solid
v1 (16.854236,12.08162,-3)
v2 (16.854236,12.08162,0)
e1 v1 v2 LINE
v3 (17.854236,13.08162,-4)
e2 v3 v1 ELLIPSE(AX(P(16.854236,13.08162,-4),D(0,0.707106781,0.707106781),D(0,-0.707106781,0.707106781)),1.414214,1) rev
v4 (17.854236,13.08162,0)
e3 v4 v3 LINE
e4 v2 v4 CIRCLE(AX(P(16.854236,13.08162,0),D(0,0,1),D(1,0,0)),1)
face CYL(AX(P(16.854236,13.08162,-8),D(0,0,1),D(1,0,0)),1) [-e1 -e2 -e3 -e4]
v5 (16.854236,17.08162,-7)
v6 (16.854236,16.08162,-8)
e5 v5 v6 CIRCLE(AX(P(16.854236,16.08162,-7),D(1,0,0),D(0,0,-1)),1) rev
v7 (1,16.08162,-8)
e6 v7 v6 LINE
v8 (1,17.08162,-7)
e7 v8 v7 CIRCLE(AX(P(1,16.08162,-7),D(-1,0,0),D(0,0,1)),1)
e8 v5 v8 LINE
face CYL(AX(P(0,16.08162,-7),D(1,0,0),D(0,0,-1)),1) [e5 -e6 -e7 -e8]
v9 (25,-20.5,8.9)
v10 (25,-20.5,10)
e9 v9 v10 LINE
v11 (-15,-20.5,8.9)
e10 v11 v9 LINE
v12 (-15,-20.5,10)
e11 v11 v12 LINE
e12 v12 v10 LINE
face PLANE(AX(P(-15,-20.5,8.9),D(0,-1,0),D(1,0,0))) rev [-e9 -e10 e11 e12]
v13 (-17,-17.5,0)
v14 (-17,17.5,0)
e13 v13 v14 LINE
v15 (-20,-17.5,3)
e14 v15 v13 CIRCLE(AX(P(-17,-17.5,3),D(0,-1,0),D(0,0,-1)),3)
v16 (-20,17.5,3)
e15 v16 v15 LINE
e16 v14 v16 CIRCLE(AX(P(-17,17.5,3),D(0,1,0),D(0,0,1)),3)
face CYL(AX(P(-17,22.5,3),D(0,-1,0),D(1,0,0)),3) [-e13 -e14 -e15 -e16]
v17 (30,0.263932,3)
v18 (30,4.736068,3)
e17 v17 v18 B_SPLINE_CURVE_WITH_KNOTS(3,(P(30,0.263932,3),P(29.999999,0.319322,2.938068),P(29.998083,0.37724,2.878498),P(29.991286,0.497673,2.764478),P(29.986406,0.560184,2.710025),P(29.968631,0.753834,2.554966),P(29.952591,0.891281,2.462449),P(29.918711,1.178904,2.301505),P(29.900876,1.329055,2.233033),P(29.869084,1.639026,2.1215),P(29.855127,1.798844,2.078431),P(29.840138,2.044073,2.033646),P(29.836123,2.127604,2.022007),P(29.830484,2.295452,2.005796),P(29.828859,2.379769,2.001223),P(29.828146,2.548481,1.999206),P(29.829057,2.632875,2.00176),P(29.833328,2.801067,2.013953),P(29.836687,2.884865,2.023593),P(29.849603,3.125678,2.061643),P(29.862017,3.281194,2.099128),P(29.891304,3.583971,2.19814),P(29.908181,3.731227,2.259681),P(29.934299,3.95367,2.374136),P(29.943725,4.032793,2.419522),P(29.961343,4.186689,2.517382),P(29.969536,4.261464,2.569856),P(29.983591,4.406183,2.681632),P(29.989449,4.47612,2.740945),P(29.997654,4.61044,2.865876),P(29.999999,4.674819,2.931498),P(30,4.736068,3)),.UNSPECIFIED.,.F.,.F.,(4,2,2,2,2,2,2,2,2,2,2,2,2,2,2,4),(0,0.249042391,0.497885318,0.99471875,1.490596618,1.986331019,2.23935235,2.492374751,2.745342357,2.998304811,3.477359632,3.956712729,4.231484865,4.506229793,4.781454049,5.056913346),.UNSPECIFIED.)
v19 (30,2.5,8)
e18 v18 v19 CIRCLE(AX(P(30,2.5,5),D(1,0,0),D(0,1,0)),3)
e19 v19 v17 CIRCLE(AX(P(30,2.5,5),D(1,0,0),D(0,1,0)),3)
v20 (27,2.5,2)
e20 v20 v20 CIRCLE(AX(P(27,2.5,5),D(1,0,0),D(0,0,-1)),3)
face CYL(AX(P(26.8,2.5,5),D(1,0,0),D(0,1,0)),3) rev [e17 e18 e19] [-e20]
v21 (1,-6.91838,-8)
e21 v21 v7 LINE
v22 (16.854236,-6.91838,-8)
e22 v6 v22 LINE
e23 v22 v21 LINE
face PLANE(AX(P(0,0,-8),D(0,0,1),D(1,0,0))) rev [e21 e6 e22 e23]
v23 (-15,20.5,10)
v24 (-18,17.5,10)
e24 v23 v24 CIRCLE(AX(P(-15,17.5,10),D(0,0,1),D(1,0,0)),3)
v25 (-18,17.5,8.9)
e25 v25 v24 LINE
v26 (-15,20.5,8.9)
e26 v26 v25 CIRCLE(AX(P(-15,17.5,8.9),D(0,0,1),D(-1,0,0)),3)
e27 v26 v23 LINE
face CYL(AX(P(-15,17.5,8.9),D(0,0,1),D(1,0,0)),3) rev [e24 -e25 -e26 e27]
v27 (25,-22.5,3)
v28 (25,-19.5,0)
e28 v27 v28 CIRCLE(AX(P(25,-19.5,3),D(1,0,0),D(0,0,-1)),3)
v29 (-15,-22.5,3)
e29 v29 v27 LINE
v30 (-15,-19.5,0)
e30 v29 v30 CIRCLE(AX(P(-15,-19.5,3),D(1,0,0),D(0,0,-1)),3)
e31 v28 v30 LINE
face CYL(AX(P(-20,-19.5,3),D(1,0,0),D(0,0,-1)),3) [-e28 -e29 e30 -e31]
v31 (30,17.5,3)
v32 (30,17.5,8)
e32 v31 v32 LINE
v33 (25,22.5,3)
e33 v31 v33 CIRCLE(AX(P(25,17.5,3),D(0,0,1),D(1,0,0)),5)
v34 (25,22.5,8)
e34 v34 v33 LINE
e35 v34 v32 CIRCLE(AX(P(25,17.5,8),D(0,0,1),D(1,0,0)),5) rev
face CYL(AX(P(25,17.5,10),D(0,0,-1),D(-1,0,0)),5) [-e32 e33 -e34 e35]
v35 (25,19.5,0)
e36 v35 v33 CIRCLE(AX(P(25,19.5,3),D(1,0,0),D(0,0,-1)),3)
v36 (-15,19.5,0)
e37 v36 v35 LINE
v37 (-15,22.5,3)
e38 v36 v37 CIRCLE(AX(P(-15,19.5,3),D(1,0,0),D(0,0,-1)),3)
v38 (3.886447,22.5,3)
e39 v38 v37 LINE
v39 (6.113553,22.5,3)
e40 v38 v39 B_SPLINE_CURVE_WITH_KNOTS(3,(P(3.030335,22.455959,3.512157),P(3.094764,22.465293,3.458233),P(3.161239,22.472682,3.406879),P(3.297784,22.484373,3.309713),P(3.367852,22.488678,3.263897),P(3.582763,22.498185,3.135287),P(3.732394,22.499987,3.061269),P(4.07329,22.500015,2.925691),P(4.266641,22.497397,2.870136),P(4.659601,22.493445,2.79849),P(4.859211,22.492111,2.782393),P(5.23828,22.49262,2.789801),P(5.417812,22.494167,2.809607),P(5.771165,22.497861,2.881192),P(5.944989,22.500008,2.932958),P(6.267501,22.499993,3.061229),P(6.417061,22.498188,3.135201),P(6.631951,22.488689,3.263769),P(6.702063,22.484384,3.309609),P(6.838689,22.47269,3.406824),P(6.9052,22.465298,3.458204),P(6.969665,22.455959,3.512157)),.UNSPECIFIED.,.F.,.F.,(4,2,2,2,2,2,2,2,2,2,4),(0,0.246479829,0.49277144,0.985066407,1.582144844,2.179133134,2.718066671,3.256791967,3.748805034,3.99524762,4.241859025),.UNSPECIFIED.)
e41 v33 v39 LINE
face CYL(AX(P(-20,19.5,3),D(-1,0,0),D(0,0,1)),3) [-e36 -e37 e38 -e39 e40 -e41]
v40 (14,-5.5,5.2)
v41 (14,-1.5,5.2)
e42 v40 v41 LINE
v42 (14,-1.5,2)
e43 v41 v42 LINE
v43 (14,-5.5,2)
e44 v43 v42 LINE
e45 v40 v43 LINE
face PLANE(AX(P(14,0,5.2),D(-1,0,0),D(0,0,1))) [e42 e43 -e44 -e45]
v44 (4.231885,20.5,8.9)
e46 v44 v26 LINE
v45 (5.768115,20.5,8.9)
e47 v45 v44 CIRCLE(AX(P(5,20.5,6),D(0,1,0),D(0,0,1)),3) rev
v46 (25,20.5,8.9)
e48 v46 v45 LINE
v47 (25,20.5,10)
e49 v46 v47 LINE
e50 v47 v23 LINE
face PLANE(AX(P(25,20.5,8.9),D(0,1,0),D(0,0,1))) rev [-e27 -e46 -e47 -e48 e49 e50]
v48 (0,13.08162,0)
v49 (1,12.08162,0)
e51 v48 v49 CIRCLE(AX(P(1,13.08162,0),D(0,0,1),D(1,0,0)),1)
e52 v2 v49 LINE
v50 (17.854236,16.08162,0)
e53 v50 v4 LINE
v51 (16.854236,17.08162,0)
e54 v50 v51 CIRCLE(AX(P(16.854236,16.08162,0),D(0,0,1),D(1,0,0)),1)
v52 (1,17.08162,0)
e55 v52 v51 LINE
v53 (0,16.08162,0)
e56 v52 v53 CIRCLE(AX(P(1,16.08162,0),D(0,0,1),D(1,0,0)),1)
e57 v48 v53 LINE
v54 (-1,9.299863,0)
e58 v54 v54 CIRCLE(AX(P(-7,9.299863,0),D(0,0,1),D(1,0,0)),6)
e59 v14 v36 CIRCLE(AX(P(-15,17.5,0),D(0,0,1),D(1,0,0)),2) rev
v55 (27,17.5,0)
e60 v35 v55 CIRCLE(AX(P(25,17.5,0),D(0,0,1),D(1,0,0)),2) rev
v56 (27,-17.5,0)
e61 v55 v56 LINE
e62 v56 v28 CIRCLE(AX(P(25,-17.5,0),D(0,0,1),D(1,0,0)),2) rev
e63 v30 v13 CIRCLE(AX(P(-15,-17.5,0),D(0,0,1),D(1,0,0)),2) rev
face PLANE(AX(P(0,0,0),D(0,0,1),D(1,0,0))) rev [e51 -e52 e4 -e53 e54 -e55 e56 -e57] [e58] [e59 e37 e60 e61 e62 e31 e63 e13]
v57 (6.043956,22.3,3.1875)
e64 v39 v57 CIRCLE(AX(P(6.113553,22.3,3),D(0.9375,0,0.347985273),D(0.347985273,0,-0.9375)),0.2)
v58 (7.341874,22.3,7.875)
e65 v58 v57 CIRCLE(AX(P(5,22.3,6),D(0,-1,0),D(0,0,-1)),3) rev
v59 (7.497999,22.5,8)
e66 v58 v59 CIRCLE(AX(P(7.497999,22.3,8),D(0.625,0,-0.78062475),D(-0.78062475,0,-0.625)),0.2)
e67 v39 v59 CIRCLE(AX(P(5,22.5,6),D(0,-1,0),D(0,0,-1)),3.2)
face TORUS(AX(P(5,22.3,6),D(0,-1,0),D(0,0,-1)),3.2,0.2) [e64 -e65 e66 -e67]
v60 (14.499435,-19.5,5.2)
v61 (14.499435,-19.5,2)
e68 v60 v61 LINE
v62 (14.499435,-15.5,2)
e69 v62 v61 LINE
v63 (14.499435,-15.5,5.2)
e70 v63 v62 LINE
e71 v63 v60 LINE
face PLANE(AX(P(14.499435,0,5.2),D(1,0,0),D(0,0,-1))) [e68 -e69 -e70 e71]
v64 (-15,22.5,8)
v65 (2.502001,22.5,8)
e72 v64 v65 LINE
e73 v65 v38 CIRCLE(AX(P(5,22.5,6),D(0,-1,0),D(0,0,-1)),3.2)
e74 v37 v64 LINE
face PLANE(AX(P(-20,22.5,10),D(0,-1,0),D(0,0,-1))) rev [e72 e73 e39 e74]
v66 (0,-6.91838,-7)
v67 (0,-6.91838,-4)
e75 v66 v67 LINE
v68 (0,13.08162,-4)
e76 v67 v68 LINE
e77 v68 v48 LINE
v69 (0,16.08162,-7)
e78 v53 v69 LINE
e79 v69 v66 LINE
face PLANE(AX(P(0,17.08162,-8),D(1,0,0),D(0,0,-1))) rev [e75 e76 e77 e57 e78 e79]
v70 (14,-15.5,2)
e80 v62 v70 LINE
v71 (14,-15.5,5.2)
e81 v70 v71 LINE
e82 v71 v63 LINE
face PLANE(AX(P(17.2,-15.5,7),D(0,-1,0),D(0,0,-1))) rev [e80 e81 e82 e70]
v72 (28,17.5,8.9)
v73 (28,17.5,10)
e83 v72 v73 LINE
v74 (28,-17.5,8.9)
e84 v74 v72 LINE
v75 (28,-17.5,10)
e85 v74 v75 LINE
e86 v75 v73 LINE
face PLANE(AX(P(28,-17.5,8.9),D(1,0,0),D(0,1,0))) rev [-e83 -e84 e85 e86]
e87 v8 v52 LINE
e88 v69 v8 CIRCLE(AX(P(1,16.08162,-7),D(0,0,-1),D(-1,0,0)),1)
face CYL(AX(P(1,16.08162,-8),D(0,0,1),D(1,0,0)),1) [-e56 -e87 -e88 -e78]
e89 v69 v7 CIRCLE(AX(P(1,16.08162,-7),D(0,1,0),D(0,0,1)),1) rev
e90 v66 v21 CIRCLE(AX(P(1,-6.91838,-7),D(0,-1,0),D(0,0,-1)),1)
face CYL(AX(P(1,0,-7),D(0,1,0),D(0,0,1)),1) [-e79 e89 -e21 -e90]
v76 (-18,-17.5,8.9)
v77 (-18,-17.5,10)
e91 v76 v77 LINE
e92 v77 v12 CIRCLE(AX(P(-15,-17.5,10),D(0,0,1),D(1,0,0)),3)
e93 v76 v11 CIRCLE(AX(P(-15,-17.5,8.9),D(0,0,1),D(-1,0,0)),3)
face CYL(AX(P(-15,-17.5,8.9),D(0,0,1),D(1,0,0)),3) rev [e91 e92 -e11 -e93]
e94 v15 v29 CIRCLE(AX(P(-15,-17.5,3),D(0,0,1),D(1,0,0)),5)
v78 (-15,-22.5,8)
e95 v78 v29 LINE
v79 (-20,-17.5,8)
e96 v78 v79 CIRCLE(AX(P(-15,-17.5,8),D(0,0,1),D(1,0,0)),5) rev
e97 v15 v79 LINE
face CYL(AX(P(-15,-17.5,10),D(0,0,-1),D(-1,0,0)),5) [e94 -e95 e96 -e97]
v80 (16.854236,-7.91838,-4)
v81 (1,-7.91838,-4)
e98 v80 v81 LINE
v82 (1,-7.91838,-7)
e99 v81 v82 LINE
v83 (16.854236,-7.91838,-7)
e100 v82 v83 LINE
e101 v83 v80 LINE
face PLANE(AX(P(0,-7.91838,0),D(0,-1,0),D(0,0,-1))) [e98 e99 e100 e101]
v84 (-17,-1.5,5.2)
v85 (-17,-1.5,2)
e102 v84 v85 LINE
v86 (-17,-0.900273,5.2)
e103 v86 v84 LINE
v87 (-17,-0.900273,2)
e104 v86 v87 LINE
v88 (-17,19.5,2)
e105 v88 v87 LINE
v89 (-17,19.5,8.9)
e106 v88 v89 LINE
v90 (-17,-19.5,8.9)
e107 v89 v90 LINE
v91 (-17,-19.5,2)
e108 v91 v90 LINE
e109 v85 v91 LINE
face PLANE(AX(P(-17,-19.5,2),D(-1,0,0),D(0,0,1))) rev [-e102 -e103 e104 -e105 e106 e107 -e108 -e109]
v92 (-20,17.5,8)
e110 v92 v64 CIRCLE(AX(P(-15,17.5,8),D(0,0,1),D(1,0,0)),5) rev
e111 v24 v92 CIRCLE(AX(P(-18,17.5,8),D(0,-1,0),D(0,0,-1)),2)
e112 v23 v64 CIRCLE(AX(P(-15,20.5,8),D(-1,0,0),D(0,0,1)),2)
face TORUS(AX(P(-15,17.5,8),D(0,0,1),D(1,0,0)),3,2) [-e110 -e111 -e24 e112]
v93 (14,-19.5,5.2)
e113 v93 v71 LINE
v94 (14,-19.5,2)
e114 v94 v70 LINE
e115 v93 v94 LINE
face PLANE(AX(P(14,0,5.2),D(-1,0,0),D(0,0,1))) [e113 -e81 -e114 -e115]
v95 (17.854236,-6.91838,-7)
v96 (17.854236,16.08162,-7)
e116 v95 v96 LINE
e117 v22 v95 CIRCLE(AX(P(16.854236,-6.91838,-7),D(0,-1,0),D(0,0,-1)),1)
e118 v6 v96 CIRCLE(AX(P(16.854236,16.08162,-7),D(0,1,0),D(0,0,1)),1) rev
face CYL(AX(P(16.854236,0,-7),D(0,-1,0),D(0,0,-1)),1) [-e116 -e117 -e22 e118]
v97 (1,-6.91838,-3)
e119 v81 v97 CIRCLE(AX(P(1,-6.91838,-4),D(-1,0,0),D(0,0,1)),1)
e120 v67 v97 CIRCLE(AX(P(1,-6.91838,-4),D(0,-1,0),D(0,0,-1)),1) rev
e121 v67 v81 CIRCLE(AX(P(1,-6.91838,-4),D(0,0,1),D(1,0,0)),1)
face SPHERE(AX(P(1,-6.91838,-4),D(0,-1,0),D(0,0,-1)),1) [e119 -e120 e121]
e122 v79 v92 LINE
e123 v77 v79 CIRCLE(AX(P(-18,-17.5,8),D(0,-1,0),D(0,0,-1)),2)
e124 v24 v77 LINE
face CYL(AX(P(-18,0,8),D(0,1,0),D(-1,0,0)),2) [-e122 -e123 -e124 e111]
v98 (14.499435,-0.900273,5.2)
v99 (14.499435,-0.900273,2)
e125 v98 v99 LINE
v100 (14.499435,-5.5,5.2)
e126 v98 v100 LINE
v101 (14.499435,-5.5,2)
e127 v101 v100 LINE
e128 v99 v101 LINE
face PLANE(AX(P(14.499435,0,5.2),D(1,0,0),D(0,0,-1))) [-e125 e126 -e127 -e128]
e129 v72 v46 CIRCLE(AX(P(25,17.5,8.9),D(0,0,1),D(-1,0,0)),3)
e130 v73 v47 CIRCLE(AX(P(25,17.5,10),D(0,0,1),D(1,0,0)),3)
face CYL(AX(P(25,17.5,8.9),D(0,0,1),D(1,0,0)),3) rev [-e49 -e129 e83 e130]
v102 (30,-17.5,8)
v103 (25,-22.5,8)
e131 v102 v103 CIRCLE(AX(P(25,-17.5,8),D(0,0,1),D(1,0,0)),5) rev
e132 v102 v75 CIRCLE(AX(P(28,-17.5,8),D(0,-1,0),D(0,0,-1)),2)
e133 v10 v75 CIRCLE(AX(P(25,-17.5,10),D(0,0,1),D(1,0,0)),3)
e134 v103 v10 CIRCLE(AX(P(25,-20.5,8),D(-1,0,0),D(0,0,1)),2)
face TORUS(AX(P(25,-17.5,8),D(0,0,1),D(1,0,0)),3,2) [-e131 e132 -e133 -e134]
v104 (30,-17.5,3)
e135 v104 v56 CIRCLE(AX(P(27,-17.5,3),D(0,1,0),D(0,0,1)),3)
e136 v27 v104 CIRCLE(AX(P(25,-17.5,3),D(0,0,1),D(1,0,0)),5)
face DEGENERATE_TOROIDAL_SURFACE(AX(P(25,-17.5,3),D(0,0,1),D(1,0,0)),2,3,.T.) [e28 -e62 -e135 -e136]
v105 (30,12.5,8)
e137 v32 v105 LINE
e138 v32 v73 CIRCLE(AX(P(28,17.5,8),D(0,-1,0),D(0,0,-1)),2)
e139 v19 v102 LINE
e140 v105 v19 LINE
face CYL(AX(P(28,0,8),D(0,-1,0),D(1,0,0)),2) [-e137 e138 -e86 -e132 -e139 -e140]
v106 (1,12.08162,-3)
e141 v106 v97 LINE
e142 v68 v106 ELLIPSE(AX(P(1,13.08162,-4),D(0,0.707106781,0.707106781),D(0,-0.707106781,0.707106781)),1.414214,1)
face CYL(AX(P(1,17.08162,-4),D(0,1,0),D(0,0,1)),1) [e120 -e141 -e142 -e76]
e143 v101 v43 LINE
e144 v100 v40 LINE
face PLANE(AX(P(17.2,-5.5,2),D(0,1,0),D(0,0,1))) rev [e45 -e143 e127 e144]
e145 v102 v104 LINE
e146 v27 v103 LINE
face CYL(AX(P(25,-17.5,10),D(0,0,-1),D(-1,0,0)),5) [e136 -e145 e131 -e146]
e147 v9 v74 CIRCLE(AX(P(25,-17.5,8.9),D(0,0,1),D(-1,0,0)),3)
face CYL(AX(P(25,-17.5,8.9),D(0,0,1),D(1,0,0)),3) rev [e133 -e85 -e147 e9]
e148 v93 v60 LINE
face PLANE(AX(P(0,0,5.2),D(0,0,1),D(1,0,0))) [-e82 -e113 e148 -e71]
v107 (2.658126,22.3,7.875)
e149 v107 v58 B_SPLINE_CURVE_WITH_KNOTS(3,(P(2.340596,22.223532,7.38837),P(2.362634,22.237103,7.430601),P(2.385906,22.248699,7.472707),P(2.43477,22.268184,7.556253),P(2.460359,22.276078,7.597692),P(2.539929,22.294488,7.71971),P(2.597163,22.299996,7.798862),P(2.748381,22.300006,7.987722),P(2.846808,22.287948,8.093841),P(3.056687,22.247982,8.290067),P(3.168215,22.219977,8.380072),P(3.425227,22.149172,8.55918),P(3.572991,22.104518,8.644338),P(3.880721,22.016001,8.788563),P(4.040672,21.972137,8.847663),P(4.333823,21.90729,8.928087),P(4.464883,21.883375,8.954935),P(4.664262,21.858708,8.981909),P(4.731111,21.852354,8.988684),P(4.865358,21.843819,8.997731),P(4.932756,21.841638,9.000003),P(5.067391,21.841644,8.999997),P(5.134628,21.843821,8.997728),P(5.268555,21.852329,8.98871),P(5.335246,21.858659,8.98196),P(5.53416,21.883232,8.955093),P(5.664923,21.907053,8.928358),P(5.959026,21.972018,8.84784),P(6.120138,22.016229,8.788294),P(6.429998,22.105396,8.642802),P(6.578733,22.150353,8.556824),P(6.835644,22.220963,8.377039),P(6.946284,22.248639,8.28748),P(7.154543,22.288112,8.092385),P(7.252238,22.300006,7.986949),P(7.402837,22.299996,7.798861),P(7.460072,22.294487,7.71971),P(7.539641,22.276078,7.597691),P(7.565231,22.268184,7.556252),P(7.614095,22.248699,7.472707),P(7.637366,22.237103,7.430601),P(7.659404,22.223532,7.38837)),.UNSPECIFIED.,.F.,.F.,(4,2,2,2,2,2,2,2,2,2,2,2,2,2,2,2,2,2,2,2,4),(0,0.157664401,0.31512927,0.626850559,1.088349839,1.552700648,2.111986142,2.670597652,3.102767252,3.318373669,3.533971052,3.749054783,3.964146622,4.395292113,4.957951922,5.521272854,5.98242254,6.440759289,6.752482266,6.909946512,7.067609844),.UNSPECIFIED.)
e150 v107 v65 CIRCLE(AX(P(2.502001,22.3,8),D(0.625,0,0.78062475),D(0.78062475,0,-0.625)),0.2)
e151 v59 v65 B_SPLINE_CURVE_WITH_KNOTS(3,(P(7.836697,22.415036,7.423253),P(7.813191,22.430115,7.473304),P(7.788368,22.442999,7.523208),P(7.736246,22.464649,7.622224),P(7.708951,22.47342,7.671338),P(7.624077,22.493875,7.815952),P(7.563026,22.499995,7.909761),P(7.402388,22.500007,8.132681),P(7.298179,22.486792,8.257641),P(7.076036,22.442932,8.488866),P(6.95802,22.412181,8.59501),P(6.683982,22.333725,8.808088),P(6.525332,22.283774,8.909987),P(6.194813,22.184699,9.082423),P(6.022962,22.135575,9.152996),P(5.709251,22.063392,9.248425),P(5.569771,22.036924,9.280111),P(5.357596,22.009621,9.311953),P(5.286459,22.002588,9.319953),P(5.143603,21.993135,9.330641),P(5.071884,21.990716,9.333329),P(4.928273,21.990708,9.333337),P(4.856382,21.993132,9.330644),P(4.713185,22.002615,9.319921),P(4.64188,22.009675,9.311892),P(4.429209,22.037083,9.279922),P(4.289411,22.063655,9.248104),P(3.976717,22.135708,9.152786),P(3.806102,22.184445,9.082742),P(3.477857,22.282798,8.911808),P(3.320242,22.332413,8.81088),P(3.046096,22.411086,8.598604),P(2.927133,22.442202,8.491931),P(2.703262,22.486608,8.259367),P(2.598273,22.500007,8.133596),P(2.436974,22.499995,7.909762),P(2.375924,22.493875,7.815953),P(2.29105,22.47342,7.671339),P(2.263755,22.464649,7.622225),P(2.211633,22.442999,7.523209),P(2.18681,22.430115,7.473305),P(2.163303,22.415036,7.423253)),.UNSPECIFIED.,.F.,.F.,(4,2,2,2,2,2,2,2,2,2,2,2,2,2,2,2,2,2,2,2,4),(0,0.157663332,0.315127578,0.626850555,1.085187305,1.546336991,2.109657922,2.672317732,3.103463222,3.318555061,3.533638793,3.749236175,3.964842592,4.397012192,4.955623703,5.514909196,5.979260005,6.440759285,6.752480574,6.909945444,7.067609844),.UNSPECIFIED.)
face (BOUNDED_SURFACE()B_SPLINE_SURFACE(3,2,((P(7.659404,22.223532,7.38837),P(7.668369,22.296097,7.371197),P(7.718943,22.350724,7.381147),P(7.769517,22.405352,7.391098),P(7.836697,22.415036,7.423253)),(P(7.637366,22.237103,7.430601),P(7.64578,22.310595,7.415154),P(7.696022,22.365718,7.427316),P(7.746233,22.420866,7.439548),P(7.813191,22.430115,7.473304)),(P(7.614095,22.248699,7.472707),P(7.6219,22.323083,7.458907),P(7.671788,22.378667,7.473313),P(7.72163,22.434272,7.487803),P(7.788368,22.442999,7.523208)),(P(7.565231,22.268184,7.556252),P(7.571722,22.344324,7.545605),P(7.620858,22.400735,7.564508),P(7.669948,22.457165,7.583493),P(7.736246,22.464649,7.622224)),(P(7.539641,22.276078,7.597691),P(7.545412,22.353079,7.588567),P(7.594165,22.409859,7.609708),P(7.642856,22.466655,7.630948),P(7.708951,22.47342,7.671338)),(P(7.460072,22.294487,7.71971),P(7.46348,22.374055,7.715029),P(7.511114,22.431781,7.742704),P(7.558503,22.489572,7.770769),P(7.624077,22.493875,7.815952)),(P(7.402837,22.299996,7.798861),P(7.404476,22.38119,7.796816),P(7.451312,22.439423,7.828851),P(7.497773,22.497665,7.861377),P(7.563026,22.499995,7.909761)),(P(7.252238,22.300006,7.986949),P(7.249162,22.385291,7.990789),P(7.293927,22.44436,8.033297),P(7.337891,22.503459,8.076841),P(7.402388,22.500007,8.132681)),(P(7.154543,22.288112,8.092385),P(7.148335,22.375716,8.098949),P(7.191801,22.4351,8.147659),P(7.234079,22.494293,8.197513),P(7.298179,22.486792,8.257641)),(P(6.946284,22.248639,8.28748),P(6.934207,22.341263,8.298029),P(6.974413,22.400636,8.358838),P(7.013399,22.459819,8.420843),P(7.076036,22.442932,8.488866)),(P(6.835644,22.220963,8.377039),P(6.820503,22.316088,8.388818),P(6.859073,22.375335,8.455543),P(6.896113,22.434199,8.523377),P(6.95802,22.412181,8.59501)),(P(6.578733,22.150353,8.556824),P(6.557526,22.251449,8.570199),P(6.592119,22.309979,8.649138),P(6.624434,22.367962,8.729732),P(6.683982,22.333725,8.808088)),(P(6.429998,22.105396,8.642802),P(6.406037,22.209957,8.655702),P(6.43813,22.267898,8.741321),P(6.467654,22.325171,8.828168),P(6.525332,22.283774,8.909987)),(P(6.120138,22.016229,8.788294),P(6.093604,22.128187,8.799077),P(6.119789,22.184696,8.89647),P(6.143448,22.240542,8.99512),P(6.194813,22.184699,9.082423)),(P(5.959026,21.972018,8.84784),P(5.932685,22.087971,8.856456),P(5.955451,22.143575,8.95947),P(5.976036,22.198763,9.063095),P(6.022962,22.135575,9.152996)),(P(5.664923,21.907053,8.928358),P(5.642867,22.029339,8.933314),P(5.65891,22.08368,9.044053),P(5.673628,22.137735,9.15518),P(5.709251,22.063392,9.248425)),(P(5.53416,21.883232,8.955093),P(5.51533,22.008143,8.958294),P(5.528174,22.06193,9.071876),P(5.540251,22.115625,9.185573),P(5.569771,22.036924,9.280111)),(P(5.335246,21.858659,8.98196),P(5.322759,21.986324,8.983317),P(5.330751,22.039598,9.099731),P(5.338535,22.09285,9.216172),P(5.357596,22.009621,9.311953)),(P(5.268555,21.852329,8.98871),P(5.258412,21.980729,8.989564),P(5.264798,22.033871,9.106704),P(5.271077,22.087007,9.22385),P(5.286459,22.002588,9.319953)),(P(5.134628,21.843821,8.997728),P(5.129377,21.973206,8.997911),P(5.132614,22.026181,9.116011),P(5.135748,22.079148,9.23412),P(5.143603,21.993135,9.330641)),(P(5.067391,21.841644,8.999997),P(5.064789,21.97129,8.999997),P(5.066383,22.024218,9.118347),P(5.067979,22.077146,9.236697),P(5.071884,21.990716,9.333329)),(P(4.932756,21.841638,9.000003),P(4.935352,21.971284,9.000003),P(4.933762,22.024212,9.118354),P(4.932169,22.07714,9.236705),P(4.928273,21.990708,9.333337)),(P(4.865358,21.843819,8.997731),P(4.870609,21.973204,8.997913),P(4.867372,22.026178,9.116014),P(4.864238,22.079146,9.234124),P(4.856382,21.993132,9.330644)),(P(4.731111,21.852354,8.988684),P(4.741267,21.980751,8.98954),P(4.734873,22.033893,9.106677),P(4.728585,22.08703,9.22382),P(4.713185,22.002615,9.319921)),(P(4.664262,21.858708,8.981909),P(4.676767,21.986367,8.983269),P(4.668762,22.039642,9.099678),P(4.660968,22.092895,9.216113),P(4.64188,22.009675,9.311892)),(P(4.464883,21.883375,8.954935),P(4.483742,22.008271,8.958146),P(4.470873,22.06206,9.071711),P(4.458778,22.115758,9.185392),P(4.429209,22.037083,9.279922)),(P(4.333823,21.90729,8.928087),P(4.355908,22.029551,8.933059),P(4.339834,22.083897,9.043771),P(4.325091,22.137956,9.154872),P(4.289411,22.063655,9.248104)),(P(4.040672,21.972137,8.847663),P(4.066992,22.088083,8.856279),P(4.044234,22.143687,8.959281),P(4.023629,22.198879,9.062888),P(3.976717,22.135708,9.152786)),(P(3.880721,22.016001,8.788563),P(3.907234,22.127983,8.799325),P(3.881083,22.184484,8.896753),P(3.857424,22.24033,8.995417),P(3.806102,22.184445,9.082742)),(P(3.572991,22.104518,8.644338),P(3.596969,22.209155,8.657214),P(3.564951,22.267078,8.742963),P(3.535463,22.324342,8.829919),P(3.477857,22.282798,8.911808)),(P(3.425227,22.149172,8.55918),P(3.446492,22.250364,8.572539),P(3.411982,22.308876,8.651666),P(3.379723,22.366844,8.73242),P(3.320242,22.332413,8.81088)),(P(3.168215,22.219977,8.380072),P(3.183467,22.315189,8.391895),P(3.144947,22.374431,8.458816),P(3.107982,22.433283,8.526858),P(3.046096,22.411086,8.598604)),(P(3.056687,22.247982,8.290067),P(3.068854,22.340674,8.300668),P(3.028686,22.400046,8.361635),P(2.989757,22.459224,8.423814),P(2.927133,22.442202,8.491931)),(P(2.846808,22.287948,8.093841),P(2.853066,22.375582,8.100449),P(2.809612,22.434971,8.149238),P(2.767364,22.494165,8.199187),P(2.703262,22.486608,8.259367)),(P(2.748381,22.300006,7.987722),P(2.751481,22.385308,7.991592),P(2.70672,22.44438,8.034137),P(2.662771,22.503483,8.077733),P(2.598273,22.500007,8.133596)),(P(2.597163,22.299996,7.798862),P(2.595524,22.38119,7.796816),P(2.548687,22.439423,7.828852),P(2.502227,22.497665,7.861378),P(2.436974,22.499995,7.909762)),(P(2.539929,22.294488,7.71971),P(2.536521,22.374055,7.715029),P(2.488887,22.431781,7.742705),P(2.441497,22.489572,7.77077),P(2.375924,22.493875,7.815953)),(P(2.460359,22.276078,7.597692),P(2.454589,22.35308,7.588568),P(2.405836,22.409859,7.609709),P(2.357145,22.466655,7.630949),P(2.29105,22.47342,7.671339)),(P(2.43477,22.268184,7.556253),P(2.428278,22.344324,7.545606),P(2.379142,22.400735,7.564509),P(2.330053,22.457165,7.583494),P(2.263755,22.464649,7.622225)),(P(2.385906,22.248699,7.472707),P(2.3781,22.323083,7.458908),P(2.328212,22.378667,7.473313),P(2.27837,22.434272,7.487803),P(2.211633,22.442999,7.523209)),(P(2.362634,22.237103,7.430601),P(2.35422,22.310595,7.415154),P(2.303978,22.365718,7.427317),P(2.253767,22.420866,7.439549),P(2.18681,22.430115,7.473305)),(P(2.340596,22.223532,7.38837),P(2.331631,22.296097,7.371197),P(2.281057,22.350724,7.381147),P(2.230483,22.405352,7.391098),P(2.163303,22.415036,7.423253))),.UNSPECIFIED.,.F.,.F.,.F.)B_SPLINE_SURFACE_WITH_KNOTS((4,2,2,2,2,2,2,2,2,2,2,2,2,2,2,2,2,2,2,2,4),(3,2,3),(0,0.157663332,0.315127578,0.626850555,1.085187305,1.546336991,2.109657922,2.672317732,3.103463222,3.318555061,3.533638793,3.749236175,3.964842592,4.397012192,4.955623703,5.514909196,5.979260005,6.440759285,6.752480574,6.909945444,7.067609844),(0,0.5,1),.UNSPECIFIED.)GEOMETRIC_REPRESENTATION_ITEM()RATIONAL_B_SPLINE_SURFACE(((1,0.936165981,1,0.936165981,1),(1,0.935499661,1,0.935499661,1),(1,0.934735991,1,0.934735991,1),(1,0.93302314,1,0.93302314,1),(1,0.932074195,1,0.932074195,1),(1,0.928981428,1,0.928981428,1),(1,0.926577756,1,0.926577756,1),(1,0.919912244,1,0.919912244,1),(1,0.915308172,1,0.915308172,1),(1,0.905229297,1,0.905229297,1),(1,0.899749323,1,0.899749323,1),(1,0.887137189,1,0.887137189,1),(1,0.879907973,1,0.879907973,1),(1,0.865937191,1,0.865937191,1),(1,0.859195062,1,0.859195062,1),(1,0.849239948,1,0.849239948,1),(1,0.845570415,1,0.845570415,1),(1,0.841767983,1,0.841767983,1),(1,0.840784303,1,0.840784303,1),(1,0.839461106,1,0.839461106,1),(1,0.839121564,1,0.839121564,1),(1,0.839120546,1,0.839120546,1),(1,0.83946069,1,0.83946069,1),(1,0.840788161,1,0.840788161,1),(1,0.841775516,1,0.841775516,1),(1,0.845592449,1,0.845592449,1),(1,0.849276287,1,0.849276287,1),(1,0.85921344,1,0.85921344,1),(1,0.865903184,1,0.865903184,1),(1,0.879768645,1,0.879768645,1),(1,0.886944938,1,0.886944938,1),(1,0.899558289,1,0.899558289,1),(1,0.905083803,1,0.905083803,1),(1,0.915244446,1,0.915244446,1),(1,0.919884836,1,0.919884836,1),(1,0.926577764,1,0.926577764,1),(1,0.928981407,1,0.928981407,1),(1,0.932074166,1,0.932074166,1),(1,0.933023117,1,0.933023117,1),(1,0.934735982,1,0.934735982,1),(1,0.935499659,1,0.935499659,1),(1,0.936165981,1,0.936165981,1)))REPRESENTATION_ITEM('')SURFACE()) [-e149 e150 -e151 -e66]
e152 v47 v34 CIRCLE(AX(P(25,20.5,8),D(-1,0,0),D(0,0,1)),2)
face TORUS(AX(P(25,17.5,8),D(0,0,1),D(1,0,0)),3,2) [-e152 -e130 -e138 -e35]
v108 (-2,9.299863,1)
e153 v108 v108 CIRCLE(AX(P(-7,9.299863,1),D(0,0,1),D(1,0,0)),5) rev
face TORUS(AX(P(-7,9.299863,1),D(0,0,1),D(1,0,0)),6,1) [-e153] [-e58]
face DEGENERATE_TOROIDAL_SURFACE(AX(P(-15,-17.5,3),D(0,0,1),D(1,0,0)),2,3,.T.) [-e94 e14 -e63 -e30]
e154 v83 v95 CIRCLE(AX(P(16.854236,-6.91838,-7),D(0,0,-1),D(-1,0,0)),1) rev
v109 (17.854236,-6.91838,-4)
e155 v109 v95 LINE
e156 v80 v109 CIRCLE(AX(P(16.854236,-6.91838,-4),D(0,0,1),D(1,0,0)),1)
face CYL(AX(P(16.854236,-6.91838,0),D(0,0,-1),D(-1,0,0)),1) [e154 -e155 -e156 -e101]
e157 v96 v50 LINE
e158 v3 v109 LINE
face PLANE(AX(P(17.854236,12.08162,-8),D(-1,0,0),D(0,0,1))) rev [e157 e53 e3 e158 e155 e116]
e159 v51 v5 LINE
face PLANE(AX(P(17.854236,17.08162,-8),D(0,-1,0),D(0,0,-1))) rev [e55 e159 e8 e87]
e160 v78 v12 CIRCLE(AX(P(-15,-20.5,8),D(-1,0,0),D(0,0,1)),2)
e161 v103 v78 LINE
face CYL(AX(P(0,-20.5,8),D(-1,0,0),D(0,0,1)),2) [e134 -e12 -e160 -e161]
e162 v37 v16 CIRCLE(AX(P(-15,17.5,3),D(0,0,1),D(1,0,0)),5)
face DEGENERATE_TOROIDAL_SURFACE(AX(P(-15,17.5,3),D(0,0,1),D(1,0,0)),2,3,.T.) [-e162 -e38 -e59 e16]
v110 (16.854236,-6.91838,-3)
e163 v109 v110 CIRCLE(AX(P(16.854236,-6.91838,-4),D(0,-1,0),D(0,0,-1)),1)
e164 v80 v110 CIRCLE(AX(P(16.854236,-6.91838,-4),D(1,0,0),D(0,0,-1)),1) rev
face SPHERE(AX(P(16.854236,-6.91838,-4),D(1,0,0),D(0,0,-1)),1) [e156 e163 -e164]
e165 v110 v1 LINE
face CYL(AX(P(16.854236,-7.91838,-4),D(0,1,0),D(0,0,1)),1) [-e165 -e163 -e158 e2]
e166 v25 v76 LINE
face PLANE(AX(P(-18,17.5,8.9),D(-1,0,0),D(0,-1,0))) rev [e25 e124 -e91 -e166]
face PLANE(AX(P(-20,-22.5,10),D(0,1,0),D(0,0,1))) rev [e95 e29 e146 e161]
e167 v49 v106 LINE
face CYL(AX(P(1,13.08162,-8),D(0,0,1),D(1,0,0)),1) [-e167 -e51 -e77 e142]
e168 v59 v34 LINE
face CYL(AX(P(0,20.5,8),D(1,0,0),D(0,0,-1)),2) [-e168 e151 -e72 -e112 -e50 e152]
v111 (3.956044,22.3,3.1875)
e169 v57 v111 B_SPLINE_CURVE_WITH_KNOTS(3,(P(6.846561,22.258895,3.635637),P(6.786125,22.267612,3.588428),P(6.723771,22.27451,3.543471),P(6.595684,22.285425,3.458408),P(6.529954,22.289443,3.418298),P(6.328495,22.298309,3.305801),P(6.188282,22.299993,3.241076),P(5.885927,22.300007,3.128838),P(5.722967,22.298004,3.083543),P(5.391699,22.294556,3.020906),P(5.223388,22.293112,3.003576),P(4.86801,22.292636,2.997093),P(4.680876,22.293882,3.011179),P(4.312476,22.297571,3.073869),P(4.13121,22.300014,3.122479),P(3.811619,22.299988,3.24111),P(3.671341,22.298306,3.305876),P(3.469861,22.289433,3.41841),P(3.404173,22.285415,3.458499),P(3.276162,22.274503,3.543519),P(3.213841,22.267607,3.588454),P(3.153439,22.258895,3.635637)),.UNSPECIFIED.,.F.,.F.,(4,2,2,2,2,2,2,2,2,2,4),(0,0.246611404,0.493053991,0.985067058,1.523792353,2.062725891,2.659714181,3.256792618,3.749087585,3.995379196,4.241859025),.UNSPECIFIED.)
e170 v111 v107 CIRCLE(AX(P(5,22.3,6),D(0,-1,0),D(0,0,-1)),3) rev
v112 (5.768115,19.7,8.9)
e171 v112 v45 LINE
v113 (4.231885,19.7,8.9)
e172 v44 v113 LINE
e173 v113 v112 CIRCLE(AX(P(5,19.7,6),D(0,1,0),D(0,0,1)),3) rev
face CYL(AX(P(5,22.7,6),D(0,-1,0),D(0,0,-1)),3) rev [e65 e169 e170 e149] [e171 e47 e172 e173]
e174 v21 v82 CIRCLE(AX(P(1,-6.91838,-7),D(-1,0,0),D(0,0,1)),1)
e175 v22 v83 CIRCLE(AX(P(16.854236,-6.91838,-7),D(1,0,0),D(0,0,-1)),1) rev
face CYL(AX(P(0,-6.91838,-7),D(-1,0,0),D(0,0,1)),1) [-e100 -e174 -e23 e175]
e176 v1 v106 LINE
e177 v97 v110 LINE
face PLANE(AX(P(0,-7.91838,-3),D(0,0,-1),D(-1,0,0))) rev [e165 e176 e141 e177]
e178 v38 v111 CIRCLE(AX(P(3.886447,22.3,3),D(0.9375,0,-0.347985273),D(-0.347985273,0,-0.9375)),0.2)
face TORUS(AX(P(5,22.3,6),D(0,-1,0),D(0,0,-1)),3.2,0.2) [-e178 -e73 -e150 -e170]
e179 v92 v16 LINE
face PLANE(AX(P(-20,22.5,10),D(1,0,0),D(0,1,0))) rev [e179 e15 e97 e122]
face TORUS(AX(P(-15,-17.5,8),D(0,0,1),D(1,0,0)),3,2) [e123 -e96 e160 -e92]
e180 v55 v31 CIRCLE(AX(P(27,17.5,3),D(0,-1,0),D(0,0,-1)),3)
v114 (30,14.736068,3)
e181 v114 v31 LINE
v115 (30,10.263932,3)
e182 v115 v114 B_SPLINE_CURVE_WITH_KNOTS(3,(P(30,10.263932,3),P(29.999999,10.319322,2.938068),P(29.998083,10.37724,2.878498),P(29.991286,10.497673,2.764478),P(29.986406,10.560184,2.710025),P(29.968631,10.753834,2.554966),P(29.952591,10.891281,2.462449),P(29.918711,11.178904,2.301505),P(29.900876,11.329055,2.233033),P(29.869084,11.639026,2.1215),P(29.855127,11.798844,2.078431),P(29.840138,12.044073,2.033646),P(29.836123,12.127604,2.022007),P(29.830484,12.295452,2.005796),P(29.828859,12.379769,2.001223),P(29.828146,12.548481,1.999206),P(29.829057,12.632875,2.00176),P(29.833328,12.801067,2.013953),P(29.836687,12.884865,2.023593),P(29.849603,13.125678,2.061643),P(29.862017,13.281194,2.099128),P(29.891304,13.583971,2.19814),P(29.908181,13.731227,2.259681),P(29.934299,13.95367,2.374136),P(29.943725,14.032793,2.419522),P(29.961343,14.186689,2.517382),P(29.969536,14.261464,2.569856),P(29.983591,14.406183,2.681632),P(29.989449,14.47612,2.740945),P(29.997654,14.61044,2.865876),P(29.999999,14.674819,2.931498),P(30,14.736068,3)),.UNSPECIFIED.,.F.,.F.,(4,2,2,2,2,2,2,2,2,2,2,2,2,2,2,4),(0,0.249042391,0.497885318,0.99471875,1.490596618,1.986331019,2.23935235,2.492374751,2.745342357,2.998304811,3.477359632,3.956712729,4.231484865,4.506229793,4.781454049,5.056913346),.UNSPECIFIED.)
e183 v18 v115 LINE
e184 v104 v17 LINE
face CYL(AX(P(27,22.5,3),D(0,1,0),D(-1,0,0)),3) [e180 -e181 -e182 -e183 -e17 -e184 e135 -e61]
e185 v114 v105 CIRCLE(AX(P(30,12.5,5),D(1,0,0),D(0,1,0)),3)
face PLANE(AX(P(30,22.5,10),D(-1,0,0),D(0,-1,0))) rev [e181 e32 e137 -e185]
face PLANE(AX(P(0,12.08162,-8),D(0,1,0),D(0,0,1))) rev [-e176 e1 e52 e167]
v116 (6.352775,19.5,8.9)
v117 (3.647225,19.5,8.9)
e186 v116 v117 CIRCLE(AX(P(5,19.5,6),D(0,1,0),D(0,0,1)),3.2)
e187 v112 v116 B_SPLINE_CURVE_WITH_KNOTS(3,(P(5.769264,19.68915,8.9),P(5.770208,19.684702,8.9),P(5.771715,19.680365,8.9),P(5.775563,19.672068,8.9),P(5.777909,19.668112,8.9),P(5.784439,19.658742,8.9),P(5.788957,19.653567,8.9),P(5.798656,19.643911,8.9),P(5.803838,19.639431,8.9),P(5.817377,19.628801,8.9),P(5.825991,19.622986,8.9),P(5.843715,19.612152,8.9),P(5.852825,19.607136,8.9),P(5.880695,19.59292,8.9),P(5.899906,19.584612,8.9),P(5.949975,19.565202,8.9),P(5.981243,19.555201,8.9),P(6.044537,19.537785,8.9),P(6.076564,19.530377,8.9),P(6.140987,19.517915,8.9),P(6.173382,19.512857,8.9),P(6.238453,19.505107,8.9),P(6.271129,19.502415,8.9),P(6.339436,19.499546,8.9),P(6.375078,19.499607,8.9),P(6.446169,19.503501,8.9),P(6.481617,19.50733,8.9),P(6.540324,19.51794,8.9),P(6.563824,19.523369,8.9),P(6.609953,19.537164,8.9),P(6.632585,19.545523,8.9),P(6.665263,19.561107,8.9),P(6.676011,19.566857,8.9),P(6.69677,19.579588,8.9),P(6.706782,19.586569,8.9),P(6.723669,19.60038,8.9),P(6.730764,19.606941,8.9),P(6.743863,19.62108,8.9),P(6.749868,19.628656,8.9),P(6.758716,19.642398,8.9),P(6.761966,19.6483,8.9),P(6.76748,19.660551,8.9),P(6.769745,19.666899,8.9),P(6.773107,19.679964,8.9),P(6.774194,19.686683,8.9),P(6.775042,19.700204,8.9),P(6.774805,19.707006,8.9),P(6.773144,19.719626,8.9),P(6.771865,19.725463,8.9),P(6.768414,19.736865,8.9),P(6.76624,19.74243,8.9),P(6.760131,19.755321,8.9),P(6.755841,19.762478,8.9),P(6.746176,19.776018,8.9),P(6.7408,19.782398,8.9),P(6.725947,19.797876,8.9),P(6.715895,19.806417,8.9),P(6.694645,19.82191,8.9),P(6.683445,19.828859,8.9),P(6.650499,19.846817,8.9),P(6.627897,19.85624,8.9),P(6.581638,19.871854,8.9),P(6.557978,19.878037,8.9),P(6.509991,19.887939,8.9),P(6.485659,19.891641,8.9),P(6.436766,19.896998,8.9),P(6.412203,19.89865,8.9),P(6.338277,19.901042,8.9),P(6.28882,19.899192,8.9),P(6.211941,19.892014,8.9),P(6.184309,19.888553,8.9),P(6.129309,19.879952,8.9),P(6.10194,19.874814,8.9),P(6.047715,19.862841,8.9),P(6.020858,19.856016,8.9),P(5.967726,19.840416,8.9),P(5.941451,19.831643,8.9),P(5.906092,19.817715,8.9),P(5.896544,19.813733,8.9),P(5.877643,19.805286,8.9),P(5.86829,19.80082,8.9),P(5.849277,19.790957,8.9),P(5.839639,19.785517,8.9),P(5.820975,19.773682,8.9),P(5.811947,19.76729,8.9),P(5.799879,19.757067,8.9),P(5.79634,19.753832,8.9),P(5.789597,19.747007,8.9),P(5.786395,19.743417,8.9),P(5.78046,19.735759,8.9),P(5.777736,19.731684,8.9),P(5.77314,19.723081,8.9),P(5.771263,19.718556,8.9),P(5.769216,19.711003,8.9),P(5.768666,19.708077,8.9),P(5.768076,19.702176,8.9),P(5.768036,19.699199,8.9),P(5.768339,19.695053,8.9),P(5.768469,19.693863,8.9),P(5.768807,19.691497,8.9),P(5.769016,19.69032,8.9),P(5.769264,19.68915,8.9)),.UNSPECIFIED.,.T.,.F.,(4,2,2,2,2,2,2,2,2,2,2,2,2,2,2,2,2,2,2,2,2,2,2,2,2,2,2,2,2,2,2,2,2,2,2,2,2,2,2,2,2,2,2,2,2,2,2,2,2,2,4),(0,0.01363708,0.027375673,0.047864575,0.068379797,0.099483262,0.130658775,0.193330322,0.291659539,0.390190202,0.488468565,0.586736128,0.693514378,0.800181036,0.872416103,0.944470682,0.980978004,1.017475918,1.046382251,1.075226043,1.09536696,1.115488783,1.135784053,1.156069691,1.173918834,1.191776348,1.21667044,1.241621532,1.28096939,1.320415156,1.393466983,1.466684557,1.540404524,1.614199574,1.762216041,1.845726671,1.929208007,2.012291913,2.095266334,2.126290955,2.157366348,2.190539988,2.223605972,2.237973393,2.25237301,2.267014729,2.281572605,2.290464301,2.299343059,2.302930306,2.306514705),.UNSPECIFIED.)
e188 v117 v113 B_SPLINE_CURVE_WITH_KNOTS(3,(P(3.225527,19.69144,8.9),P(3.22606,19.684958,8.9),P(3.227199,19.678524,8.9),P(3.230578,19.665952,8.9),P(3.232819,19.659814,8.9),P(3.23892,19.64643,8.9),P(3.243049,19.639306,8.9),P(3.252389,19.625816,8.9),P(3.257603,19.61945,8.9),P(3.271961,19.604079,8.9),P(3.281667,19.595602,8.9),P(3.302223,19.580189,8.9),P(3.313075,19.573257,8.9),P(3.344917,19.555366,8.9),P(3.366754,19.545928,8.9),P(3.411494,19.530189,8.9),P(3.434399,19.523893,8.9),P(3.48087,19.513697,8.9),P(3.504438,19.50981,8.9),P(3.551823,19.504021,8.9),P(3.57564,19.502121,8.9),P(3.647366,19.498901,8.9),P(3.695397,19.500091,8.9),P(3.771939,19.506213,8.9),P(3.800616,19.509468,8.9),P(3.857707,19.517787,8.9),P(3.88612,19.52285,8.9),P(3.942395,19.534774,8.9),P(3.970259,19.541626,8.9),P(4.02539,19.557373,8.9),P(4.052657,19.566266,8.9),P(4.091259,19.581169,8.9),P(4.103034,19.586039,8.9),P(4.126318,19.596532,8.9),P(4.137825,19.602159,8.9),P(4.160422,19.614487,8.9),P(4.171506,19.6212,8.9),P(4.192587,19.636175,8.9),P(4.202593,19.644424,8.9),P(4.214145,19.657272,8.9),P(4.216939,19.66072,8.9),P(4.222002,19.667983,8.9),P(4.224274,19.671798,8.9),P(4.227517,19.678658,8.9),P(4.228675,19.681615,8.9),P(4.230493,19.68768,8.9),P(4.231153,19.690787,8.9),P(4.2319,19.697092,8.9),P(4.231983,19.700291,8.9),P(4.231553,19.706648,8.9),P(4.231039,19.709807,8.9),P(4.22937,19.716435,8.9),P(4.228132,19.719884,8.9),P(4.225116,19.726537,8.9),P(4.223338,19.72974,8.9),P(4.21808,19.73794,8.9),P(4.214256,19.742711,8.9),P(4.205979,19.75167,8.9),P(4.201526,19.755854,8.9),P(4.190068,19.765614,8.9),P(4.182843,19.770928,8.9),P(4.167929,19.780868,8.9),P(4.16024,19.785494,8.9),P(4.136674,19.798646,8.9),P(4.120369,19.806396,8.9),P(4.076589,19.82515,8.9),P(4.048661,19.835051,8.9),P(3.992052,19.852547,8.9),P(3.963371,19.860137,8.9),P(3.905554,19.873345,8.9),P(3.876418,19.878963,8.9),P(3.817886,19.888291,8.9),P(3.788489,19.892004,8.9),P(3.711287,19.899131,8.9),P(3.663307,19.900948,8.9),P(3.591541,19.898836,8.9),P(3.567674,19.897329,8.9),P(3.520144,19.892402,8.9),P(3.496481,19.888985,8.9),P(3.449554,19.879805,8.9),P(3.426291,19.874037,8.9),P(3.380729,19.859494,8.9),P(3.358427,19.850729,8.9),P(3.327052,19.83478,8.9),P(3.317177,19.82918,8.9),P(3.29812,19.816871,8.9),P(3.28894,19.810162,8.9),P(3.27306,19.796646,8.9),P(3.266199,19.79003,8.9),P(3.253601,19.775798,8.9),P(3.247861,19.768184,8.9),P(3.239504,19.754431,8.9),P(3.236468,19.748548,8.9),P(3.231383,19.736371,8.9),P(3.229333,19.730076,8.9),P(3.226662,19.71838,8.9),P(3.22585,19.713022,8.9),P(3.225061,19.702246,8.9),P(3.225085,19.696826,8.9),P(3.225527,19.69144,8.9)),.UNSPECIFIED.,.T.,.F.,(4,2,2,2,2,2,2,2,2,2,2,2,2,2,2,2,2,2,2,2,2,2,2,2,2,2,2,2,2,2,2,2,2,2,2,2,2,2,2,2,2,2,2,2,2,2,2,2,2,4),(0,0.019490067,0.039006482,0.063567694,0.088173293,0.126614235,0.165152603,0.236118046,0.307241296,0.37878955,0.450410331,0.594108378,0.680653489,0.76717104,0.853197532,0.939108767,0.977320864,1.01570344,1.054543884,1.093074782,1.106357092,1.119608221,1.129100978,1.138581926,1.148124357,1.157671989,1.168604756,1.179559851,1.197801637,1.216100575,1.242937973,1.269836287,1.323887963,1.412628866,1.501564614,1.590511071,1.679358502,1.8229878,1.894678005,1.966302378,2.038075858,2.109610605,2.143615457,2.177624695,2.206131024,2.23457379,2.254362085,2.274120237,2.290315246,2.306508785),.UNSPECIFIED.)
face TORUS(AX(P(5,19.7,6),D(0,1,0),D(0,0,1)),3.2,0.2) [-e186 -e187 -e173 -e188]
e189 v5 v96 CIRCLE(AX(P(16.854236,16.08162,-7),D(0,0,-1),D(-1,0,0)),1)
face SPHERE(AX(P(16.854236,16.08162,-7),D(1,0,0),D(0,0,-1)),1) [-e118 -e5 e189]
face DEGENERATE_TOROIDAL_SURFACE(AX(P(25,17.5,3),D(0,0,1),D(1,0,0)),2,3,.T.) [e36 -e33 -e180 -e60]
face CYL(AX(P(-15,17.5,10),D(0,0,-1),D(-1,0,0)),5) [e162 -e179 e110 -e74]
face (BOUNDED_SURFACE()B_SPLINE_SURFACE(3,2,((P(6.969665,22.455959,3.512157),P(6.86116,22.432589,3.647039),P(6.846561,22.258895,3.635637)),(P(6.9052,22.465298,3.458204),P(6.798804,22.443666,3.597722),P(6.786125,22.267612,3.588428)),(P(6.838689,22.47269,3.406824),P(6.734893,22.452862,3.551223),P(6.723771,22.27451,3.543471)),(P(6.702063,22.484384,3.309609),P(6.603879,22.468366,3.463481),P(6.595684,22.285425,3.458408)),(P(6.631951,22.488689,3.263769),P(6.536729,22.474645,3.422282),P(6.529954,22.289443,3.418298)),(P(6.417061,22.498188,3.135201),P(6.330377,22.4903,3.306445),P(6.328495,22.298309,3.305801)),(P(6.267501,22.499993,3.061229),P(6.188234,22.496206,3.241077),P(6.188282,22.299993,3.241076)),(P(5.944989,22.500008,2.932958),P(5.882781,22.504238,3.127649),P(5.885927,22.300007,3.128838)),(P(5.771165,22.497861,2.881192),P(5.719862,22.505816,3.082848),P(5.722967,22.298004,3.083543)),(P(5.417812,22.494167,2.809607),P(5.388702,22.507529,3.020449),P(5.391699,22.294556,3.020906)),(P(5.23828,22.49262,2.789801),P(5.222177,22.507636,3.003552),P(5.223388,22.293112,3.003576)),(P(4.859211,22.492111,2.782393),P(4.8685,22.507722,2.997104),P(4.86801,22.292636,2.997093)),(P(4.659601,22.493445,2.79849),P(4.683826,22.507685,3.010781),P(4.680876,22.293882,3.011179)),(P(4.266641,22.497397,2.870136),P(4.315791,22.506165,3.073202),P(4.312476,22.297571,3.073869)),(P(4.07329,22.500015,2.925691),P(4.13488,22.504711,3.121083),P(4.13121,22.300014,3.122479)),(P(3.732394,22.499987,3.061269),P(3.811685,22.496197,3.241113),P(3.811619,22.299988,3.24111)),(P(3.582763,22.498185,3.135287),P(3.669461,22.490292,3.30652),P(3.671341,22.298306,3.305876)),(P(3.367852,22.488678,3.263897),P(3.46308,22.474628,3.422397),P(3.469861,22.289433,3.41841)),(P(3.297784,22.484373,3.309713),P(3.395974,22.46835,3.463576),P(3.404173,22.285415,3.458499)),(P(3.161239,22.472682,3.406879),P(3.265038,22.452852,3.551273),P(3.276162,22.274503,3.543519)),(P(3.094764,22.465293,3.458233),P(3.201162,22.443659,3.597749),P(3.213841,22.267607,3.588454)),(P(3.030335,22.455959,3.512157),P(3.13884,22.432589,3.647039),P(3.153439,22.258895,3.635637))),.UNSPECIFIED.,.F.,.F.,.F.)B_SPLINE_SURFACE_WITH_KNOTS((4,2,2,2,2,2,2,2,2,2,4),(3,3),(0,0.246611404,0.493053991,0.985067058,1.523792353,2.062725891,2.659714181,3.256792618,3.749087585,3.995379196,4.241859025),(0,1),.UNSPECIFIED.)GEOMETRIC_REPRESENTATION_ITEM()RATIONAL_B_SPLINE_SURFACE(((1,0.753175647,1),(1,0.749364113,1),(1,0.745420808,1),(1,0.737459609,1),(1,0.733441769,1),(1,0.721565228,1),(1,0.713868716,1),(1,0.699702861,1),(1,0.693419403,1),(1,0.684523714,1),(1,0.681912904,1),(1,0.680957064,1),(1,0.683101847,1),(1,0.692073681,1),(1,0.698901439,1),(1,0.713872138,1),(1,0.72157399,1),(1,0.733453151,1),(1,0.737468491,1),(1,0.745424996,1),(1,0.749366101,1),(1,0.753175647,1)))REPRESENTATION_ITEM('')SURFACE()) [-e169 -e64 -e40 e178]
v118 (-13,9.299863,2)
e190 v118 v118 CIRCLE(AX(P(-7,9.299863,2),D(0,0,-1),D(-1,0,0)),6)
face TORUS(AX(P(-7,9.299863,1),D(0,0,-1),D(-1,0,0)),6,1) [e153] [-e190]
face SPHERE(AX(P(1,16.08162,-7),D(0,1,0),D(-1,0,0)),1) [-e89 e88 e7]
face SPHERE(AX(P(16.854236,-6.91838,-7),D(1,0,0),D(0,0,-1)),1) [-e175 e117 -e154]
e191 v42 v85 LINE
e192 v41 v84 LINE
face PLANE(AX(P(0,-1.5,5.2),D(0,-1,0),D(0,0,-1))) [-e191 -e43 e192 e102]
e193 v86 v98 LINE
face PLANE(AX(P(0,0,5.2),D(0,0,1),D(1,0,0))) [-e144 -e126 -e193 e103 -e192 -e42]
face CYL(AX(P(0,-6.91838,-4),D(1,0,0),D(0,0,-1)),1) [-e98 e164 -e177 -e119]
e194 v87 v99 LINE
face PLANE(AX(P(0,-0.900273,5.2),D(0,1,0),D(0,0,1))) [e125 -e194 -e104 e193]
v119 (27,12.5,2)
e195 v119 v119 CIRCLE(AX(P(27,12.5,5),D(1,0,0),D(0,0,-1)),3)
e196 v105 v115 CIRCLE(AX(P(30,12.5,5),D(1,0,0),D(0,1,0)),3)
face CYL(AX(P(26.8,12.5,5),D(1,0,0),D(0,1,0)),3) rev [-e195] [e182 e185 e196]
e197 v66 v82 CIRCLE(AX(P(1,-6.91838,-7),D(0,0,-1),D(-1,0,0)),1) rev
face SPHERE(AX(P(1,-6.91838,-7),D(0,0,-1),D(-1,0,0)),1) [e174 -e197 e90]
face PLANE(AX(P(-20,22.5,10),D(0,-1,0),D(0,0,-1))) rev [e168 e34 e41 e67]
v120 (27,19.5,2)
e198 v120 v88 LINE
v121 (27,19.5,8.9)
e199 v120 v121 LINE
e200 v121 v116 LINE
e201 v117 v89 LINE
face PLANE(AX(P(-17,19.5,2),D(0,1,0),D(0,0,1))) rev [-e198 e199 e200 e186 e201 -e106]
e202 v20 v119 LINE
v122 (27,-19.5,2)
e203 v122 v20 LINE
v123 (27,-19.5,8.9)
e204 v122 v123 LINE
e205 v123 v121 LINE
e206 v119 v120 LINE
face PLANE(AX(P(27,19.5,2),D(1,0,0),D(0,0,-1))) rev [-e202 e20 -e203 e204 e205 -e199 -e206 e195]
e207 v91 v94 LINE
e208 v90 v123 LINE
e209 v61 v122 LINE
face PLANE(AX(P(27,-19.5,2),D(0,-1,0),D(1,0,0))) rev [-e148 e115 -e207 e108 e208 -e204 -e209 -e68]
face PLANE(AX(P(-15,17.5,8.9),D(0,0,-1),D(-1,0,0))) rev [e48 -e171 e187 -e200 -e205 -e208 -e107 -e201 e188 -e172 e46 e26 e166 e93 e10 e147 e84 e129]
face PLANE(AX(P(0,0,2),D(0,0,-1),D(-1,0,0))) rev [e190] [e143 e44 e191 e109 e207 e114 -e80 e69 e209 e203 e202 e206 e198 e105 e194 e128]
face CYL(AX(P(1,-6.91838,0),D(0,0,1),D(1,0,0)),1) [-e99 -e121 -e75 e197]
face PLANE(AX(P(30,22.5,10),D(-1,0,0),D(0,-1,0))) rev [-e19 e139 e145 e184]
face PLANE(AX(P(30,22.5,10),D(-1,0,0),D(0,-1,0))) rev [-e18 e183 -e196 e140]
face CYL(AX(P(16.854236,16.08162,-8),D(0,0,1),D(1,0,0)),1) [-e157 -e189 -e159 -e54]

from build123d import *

# Parameters (mm, degrees)
ESBO_O1_W                = 50
ESBO_O1_H                = 45
RESSALTO_EXTRUS_O1_DEPTH = 10
FILETE1_R                = 5
FILETE2_R                = 3
FILETE3_R                = 2
ESBO_O2_W                = 44
ESBO_O2_H                = 39
CORTE_EXTRUS_O1_DEPTH    = 8
RESSALTO_EXTRUS_O3_DEPTH = 3.2
ESBO_O5_W                = 5
ESBO_O5_H                = 10
CORTE_EXTRUS_O2_DEPTH    = 3.2
ESBO_O6_R                = 5
CORTE_EXTRUS_O3_DEPTH    = 3.2
FILETE4_R                = 1
ESBO_O7_R                = 3
CORTE_EXTRUS_O4_DEPTH    = 3.2
ESBO_O8_R                = 3
CORTE_EXTRUS_O5_DEPTH    = 3.2
FILETE7_R                = 0.2
CORTE_EXTRUS_O11_DEPTH   = 1.1
ESBO_O13_W               = 17.854236102
ESBO_O13_H               = 5
RESSALTO_EXTRUS_O5_DEPTH = 8
ESBO_O14_W               = 17.854236102
ESBO_O14_H               = 5
RESSALTO_EXTRUS_O6_DEPTH = 20
FILETE11_R               = 1


with BuildPart() as part:
    # Esboço1 → Ressalto-extrusão1 (new body)
    with BuildSketch(Plane.XY):
        with Locations((5, 0)):
            Rectangle(ESBO_O1_W, ESBO_O1_H)
    extrude(amount=RESSALTO_EXTRUS_O1_DEPTH)

    # Filete1
    filete1_edges = [part.edges().sort_by_distance(p)[0] for p in [
        (-20, 22.5, 5),
        (30, 22.5, 5),
        (30, -22.5, 5),
        (-20, -22.5, 5),
    ]]
    fillet(filete1_edges, radius=FILETE1_R)

    # Filete2
    filete2_edges = [part.edges().sort_by_distance(p)[0] for p in [
        (-20, 0, 0),
        (5, 22.5, 0),
        (30, 0, 0),
        (5, -22.5, 0),
        (28.535533906, 21.035533906, 0),
        (28.535533906, -21.035533906, 0),
        (-18.535533906, -21.035533906, 0),
        (-18.535533906, 21.035533906, 0),
    ]]
    fillet(filete2_edges, radius=FILETE2_R)

    # Filete3
    filete3_edges = [part.edges().sort_by_distance(p)[0] for p in [
        (-20, 0, 10),
        (5, 22.5, 10),
        (5, -22.5, 10),
        (30, 0, 10),
        (28.535533906, 21.035533906, 10),
        (28.535533906, -21.035533906, 10),
        (-18.535533906, -21.035533906, 10),
        (-18.535533906, 21.035533906, 10),
    ]]
    fillet(filete3_edges, radius=FILETE3_R)

    # Esboço2 → Corte-extrusão1 (cut)
    with BuildSketch(Plane.XY.offset(10)):
        with Locations((5, 0)):
            Rectangle(ESBO_O2_W, ESBO_O2_H)
    extrude(amount=-CORTE_EXTRUS_O1_DEPTH, mode=Mode.SUBTRACT)

    # Esboço3 → Ressalto-extrusão3 (add)
    with BuildSketch(Plane.XY.offset(2)):
        Polygon((14.499434738, -0.900273227), (-17, -0.900273227), (-17, -1.5), (14, -1.5), (14, -19.5), (14.499434738, -19.5), align=None)
    extrude(amount=RESSALTO_EXTRUS_O3_DEPTH)

    # Esboço5 → Corte-extrusão2 (cut)
    with BuildSketch(Plane.ZY.offset(-14)):
        with Locations((4.5, -10.5)):
            Rectangle(ESBO_O5_W, ESBO_O5_H)
    extrude(amount=-CORTE_EXTRUS_O2_DEPTH, mode=Mode.SUBTRACT)

    # Esboço6 → Corte-extrusão3 (cut)
    with BuildSketch(Plane.XY.offset(2)):
        with Locations((-7, 9.299863387)):
            Circle(ESBO_O6_R)
    extrude(amount=-CORTE_EXTRUS_O3_DEPTH, mode=Mode.SUBTRACT)

    # Filete4
    filete4_edges = [part.edges().sort_by_distance(p)[0] for p in [
        (-12, 9.299863387, 0),
        (-12, 9.299863387, 2),
    ]]
    fillet(filete4_edges, radius=FILETE4_R - 0.0001)  # a hair under: the kernel refuses the full size

    # Esboço7 → Corte-extrusão4 (cut)
    with BuildSketch(Plane(origin=(30, 0, 0), x_dir=(0, 0, -1), z_dir=(1, 0, 0))):
        with Locations(Location((-5, 2.5, 0), (0, 0, 48.189685104))):
            Circle(ESBO_O7_R)
        with Locations(Location((-5, 12.5, 0), (0, 0, 48.189685104))):
            Circle(ESBO_O7_R)
    extrude(amount=-CORTE_EXTRUS_O4_DEPTH, mode=Mode.SUBTRACT)

    # Esboço8 → Corte-extrusão5 (cut)
    with BuildSketch(Plane.XZ.offset(-19.5)):
        with Locations(Location((5, 6, 0), (0, 0, 270))):
            Circle(ESBO_O8_R)
    extrude(amount=-CORTE_EXTRUS_O5_DEPTH, mode=Mode.SUBTRACT)

    # Filete7
    filete7_edges = [part.edges().sort_by_distance(p)[0] for p in [
        (2.261387212, 22.5, 4.775255129),
        (7.738612788, 22.5, 4.775255129),
        (5, 22.232050808, 9),
        (5, 19.5, 9),
    ]]
    fillet(filete7_edges, radius=FILETE7_R)

    # Esboço11 → Corte-extrusão11 (cut)
    with BuildSketch(Plane.XY.offset(10)):
        with BuildLine():
            Line((-18, 17.5), (-18, -17.5))
            ThreePointArc((-18, -17.5), (-17.121320344, -19.621320344), (-15, -20.5))
            Line((-15, -20.5), (25, -20.5))
            ThreePointArc((25, -20.5), (27.121320344, -19.621320344), (28, -17.5))
            Line((28, -17.5), (28, 17.5))
            ThreePointArc((28, 17.5), (27.121320344, 19.621320344), (25, 20.5))
            Line((25, 20.5), (-15, 20.5))
            ThreePointArc((-15, 20.5), (-17.121320344, 19.621320344), (-18, 17.5))
        make_face()
    extrude(amount=-CORTE_EXTRUS_O11_DEPTH, mode=Mode.SUBTRACT)

    # Esboço13 → Ressalto-extrusão5 (add)
    with BuildSketch(Plane(origin=(0, 0, 0), x_dir=(-1, 0, 0), z_dir=(0, 0, -1))):
        with Locations((-8.927118051, 14.581619967)):
            Rectangle(ESBO_O13_W, ESBO_O13_H)
    extrude(amount=RESSALTO_EXTRUS_O5_DEPTH)

    # Esboço14 → Ressalto-extrusão6 (add)
    with BuildSketch(Plane.XZ.offset(-12.081619967)):
        with Locations((8.927118051, -5.5)):
            Rectangle(ESBO_O14_W, ESBO_O14_H)
    extrude(amount=RESSALTO_EXTRUS_O6_DEPTH)

    # Filete11
    filete11_edges = [part.edges().sort_by_distance(p)[0] for p in [
        (17.854236102, 17.081619967, -4),
        (0, 17.081619967, -4),
        (17.854236102, 4.581619967, -8),
        (0, 4.581619967, -8),
        (8.927118051, 17.081619967, -8),
        (0, 12.081619967, -1.5),
        (17.854236102, 12.081619967, -1.5),
        (0, 2.081619967, -3),
        (17.854236102, 2.081619967, -3),
        (0, -7.918380033, -5.5),
        (8.927118051, -7.918380033, -8),
        (17.854236102, -7.918380033, -5.5),
        (8.927118051, -7.918380033, -3),
    ]]
    fillet(filete11_edges, radius=FILETE11_R)


solid = part.part
